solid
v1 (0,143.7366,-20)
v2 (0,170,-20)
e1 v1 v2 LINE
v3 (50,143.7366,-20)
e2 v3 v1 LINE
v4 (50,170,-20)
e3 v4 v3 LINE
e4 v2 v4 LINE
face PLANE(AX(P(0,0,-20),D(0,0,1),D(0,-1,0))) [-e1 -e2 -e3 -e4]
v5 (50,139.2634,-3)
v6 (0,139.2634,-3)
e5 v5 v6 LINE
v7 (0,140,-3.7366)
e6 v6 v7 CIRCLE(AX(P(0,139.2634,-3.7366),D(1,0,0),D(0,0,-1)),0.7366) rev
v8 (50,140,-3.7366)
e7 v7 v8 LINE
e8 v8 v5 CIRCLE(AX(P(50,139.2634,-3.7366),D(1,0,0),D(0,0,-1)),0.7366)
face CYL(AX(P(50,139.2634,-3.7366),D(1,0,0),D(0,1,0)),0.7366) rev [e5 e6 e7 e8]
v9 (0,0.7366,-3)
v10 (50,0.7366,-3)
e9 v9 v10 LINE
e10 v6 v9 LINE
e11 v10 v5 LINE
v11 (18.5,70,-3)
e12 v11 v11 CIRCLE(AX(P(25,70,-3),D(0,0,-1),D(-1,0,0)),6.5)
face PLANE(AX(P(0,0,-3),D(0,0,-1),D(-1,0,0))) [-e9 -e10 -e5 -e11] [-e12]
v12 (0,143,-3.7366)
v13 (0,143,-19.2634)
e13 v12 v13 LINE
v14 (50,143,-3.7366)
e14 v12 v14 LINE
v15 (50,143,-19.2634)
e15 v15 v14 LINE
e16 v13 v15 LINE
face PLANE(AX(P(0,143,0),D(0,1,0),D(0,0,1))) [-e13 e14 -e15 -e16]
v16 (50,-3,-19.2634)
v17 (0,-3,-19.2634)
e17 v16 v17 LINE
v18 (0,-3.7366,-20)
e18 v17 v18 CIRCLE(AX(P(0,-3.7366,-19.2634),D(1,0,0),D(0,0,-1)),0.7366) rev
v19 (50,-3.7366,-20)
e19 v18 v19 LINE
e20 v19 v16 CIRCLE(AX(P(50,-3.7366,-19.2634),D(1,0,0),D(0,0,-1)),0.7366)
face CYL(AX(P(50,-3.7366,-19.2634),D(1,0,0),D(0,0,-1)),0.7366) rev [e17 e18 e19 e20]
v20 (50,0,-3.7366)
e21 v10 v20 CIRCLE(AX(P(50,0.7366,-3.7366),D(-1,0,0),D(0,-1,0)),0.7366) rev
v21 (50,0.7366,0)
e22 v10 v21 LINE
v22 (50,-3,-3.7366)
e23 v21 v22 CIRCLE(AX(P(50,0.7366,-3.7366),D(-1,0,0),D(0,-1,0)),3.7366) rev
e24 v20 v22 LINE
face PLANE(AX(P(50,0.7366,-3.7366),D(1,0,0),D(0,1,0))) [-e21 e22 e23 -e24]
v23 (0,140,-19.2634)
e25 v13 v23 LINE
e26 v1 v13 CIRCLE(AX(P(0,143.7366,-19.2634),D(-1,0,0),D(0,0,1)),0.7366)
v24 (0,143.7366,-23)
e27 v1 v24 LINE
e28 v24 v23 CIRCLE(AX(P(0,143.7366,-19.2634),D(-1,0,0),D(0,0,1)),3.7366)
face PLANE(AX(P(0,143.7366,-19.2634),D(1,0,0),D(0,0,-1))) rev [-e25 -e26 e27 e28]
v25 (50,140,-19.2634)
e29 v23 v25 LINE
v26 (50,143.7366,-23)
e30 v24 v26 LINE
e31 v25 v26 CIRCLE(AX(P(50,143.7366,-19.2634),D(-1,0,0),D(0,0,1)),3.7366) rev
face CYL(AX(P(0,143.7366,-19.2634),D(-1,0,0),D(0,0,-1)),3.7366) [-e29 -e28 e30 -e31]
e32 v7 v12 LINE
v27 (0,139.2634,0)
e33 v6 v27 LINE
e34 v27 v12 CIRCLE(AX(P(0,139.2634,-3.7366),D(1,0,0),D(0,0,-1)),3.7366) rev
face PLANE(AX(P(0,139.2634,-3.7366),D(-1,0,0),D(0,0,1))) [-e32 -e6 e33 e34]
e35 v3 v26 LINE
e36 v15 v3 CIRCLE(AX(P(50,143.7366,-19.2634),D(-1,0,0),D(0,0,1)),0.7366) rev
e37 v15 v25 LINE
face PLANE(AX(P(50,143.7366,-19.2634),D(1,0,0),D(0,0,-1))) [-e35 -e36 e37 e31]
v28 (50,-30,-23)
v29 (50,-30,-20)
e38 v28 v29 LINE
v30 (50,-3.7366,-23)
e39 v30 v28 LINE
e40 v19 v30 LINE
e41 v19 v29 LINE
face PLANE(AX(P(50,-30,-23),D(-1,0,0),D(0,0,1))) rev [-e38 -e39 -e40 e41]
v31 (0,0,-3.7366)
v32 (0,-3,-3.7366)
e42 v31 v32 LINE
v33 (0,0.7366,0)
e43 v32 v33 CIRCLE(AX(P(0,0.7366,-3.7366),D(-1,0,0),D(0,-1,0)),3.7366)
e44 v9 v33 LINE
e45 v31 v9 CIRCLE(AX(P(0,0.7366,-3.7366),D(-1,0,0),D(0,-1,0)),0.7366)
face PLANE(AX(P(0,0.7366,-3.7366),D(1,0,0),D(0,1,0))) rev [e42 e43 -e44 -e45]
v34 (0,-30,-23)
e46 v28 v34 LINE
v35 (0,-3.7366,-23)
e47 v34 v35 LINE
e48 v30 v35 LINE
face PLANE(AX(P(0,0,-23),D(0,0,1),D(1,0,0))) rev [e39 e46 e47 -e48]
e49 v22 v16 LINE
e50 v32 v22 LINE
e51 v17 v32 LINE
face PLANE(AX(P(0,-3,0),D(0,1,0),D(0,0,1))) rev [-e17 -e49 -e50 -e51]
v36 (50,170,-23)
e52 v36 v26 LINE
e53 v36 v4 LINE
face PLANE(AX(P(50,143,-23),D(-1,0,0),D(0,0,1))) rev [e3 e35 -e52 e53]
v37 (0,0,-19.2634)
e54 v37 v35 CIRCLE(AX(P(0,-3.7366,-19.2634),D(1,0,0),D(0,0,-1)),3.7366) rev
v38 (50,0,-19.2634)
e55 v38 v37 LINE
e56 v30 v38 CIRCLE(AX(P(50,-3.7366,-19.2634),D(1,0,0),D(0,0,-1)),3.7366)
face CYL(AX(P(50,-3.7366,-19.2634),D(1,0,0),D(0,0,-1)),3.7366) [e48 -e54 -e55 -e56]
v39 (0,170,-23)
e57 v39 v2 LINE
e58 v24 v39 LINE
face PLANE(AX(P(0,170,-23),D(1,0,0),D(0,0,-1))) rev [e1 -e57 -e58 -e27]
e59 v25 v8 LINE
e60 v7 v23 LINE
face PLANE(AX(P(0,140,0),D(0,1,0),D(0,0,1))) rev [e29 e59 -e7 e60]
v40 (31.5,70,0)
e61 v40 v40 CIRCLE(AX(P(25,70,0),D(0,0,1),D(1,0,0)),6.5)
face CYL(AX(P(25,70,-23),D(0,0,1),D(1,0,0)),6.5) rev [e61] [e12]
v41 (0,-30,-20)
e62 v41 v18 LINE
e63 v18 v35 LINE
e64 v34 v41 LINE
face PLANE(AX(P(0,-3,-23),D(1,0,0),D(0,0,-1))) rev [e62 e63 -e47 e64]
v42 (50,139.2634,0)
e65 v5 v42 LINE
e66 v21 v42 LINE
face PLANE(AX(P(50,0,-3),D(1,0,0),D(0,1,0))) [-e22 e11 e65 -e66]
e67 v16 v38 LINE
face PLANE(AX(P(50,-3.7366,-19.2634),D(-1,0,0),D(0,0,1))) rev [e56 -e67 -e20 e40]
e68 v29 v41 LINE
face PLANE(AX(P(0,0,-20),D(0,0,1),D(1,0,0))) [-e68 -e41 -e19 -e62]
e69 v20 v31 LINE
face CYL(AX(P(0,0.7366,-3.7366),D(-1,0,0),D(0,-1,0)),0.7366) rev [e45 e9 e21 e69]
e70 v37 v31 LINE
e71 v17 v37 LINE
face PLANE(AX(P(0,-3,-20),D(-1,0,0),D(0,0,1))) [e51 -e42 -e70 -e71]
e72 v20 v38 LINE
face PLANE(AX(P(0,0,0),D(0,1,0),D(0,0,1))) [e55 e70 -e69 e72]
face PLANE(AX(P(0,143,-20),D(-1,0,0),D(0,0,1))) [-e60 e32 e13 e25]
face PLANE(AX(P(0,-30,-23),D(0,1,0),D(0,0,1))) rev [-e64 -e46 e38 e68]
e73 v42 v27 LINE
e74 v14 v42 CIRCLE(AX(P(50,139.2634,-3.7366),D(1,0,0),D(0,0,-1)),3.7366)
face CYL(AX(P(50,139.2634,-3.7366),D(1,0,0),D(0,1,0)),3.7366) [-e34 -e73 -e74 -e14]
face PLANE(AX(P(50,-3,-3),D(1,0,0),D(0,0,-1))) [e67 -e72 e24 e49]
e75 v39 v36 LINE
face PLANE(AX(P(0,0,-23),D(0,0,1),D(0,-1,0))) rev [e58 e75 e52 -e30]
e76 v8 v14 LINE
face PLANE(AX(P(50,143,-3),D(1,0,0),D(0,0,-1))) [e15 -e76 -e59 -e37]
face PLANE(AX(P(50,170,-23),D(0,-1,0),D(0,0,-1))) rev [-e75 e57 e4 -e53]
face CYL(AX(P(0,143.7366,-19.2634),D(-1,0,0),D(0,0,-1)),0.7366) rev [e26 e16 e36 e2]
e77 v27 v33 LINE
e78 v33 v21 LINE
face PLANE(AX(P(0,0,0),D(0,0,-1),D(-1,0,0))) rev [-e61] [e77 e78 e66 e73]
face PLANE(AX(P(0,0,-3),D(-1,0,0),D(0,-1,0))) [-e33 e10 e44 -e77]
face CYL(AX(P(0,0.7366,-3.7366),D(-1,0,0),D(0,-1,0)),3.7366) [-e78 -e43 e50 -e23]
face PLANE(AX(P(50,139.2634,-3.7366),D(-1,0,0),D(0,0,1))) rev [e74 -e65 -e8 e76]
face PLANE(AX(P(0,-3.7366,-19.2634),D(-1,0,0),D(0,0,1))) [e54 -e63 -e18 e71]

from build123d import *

# Parameters (mm, degrees)
SKETCH_1_W                         = 50
SKETCH_1_H                         = 140
SM_BASE_FLANGE_1_DEPTH             = 3
SM_EDGE_FLANGE_1_STRIP_W           = 13.4732
SM_EDGE_FLANGE_1_STRIP_H           = 3
SM_EDGE_FLANGE_1_STRIP_CUT_DEPTH   = 50
SM_EDGE_FLANGE_1_STRIP_2_W         = 13.4732
SM_EDGE_FLANGE_1_STRIP_2_H         = 3
SM_EDGE_FLANGE_1_STRIP_CUT_2_DEPTH = 50
SM_EDGE_FLANGE_1_DEPTH             = 50
SM_EDGE_FLANGE_1_BEND_DEPTH        = 50
SM_EDGE_FLANGE_2_STRIP_W           = 13.4732
SM_EDGE_FLANGE_2_STRIP_H           = 3
SM_EDGE_FLANGE_2_STRIP_CUT_DEPTH   = 50
SM_EDGE_FLANGE_2_STRIP_2_W         = 13.4732
SM_EDGE_FLANGE_2_STRIP_2_H         = 3
SM_EDGE_FLANGE_2_STRIP_CUT_2_DEPTH = 50
SM_EDGE_FLANGE_2_DEPTH             = 50
SM_EDGE_FLANGE_2_BEND_DEPTH        = 50
SKETCH_18_R                        = 6.5
CUT_EXTRUDE_1_DEPTH                = 179.686876966


# Sheet-metal steps are written as plain solids
with BuildPart() as part:
    # Sketch 1 → 基体-法兰1 (new body)
    with BuildSketch(Plane.XY):
        with Locations((25, 70)):
            Rectangle(SKETCH_1_W, SKETCH_1_H)
    extrude(amount=-SM_BASE_FLANGE_1_DEPTH)

    # 边线-法兰1 strip (across the edge) → 边线-法兰1 strip cut (cut)
    with BuildSketch(Plane(origin=(0, 140, -3), x_dir=(0, -1, 0), z_dir=(1, 0, 0))):
        with Locations((-6, -1.5)):
            Rectangle(SM_EDGE_FLANGE_1_STRIP_W, SM_EDGE_FLANGE_1_STRIP_H)
    extrude(amount=SM_EDGE_FLANGE_1_STRIP_CUT_DEPTH, mode=Mode.SUBTRACT)

    # 边线-法兰1 strip 2 (across the edge) → 边线-法兰1 strip cut 2 (cut)
    with BuildSketch(Plane(origin=(50, 0, -3), x_dir=(0, 1, 0), z_dir=(-1, 0, 0))):
        with Locations((-6, -1.5)):
            Rectangle(SM_EDGE_FLANGE_1_STRIP_2_W, SM_EDGE_FLANGE_1_STRIP_2_H)
    extrude(amount=SM_EDGE_FLANGE_1_STRIP_CUT_2_DEPTH, mode=Mode.SUBTRACT)

    # 边线-法兰1 section (across the edge) → 边线-法兰1 (add)
    with BuildSketch(Plane(origin=(0, 140, -3), x_dir=(0, -1, 0), z_dir=(1, 0, 0))):
        with BuildLine():
            Line((-3, 0.7366), (-3, 17))
            Line((-3, 17), (0, 17))
            Line((0, 17), (0, 0.7366))
            ThreePointArc((0, 0.7366), (0.215745145, 0.215745145), (0.7366, 0))
            Line((0.7366, 0), (0.7366, -3))
            ThreePointArc((0.7366, -3), (-1.905575199, -1.905575199), (-3, 0.7366))
        make_face()
    extrude(amount=SM_EDGE_FLANGE_1_DEPTH)

    # 边线-法兰1 section 2 (across the edge) → 边线-法兰1 bend (add)
    with BuildSketch(Plane(origin=(50, 0, -3), x_dir=(0, 1, 0), z_dir=(-1, 0, 0))):
        with BuildLine():
            Line((-3, 0.7366), (-3, 17))
            Line((-3, 17), (0, 17))
            Line((0, 17), (0, 0.7366))
            ThreePointArc((0, 0.7366), (0.215745145, 0.215745145), (0.7366, 0))
            Line((0.7366, 0), (0.7366, -3))
            ThreePointArc((0.7366, -3), (-1.905575199, -1.905575199), (-3, 0.7366))
        make_face()
    extrude(amount=SM_EDGE_FLANGE_1_BEND_DEPTH)

    # 边线-法兰2 strip (across the edge) → 边线-法兰2 strip cut (cut)
    with BuildSketch(Plane(origin=(0, -3, -20), x_dir=(0, 0, 1), z_dir=(1, 0, 0))):
        with Locations((-6, -1.5)):
            Rectangle(SM_EDGE_FLANGE_2_STRIP_W, SM_EDGE_FLANGE_2_STRIP_H)
    extrude(amount=SM_EDGE_FLANGE_2_STRIP_CUT_DEPTH, mode=Mode.SUBTRACT)

    # 边线-法兰2 strip 2 (across the edge) → 边线-法兰2 strip cut 2 (cut)
    with BuildSketch(Plane(origin=(50, 143, -20), x_dir=(0, 0, 1), z_dir=(-1, 0, 0))):
        with Locations((-6, -1.5)):
            Rectangle(SM_EDGE_FLANGE_2_STRIP_2_W, SM_EDGE_FLANGE_2_STRIP_2_H)
    extrude(amount=SM_EDGE_FLANGE_2_STRIP_CUT_2_DEPTH, mode=Mode.SUBTRACT)

    # 边线-法兰2 section (across the edge) → 边线-法兰2 (add)
    with BuildSketch(Plane(origin=(0, -3, -20), x_dir=(0, 0, 1), z_dir=(1, 0, 0))):
        with BuildLine():
            Line((-3, 0.7366), (-3, 27))
            Line((-3, 27), (0, 27))
            Line((0, 27), (0, 0.7366))
            ThreePointArc((0, 0.7366), (0.215745145, 0.215745145), (0.7366, 0))
            Line((0.7366, 0), (0.7366, -3))
            ThreePointArc((0.7366, -3), (-1.905575199, -1.905575199), (-3, 0.7366))
        make_face()
    extrude(amount=SM_EDGE_FLANGE_2_DEPTH)

    # 边线-法兰2 section 2 (across the edge) → 边线-法兰2 bend (add)
    with BuildSketch(Plane(origin=(50, 143, -20), x_dir=(0, 0, 1), z_dir=(-1, 0, 0))):
        with BuildLine():
            Line((-3, 0.7366), (-3, 27))
            Line((-3, 27), (0, 27))
            Line((0, 27), (0, 0.7366))
            ThreePointArc((0, 0.7366), (0.215745145, 0.215745145), (0.7366, 0))
            Line((0.7366, 0), (0.7366, -3))
            ThreePointArc((0.7366, -3), (-1.905575199, -1.905575199), (-3, 0.7366))
        make_face()
    extrude(amount=SM_EDGE_FLANGE_2_BEND_DEPTH)

    # 草图18 → 切除-拉伸1 (cut, through all)
    with BuildSketch(Plane.XY):
        with Locations((25, 70)):
            Circle(SKETCH_18_R)
    extrude(amount=-CUT_EXTRUDE_1_DEPTH, mode=Mode.SUBTRACT)


solid = part.part
